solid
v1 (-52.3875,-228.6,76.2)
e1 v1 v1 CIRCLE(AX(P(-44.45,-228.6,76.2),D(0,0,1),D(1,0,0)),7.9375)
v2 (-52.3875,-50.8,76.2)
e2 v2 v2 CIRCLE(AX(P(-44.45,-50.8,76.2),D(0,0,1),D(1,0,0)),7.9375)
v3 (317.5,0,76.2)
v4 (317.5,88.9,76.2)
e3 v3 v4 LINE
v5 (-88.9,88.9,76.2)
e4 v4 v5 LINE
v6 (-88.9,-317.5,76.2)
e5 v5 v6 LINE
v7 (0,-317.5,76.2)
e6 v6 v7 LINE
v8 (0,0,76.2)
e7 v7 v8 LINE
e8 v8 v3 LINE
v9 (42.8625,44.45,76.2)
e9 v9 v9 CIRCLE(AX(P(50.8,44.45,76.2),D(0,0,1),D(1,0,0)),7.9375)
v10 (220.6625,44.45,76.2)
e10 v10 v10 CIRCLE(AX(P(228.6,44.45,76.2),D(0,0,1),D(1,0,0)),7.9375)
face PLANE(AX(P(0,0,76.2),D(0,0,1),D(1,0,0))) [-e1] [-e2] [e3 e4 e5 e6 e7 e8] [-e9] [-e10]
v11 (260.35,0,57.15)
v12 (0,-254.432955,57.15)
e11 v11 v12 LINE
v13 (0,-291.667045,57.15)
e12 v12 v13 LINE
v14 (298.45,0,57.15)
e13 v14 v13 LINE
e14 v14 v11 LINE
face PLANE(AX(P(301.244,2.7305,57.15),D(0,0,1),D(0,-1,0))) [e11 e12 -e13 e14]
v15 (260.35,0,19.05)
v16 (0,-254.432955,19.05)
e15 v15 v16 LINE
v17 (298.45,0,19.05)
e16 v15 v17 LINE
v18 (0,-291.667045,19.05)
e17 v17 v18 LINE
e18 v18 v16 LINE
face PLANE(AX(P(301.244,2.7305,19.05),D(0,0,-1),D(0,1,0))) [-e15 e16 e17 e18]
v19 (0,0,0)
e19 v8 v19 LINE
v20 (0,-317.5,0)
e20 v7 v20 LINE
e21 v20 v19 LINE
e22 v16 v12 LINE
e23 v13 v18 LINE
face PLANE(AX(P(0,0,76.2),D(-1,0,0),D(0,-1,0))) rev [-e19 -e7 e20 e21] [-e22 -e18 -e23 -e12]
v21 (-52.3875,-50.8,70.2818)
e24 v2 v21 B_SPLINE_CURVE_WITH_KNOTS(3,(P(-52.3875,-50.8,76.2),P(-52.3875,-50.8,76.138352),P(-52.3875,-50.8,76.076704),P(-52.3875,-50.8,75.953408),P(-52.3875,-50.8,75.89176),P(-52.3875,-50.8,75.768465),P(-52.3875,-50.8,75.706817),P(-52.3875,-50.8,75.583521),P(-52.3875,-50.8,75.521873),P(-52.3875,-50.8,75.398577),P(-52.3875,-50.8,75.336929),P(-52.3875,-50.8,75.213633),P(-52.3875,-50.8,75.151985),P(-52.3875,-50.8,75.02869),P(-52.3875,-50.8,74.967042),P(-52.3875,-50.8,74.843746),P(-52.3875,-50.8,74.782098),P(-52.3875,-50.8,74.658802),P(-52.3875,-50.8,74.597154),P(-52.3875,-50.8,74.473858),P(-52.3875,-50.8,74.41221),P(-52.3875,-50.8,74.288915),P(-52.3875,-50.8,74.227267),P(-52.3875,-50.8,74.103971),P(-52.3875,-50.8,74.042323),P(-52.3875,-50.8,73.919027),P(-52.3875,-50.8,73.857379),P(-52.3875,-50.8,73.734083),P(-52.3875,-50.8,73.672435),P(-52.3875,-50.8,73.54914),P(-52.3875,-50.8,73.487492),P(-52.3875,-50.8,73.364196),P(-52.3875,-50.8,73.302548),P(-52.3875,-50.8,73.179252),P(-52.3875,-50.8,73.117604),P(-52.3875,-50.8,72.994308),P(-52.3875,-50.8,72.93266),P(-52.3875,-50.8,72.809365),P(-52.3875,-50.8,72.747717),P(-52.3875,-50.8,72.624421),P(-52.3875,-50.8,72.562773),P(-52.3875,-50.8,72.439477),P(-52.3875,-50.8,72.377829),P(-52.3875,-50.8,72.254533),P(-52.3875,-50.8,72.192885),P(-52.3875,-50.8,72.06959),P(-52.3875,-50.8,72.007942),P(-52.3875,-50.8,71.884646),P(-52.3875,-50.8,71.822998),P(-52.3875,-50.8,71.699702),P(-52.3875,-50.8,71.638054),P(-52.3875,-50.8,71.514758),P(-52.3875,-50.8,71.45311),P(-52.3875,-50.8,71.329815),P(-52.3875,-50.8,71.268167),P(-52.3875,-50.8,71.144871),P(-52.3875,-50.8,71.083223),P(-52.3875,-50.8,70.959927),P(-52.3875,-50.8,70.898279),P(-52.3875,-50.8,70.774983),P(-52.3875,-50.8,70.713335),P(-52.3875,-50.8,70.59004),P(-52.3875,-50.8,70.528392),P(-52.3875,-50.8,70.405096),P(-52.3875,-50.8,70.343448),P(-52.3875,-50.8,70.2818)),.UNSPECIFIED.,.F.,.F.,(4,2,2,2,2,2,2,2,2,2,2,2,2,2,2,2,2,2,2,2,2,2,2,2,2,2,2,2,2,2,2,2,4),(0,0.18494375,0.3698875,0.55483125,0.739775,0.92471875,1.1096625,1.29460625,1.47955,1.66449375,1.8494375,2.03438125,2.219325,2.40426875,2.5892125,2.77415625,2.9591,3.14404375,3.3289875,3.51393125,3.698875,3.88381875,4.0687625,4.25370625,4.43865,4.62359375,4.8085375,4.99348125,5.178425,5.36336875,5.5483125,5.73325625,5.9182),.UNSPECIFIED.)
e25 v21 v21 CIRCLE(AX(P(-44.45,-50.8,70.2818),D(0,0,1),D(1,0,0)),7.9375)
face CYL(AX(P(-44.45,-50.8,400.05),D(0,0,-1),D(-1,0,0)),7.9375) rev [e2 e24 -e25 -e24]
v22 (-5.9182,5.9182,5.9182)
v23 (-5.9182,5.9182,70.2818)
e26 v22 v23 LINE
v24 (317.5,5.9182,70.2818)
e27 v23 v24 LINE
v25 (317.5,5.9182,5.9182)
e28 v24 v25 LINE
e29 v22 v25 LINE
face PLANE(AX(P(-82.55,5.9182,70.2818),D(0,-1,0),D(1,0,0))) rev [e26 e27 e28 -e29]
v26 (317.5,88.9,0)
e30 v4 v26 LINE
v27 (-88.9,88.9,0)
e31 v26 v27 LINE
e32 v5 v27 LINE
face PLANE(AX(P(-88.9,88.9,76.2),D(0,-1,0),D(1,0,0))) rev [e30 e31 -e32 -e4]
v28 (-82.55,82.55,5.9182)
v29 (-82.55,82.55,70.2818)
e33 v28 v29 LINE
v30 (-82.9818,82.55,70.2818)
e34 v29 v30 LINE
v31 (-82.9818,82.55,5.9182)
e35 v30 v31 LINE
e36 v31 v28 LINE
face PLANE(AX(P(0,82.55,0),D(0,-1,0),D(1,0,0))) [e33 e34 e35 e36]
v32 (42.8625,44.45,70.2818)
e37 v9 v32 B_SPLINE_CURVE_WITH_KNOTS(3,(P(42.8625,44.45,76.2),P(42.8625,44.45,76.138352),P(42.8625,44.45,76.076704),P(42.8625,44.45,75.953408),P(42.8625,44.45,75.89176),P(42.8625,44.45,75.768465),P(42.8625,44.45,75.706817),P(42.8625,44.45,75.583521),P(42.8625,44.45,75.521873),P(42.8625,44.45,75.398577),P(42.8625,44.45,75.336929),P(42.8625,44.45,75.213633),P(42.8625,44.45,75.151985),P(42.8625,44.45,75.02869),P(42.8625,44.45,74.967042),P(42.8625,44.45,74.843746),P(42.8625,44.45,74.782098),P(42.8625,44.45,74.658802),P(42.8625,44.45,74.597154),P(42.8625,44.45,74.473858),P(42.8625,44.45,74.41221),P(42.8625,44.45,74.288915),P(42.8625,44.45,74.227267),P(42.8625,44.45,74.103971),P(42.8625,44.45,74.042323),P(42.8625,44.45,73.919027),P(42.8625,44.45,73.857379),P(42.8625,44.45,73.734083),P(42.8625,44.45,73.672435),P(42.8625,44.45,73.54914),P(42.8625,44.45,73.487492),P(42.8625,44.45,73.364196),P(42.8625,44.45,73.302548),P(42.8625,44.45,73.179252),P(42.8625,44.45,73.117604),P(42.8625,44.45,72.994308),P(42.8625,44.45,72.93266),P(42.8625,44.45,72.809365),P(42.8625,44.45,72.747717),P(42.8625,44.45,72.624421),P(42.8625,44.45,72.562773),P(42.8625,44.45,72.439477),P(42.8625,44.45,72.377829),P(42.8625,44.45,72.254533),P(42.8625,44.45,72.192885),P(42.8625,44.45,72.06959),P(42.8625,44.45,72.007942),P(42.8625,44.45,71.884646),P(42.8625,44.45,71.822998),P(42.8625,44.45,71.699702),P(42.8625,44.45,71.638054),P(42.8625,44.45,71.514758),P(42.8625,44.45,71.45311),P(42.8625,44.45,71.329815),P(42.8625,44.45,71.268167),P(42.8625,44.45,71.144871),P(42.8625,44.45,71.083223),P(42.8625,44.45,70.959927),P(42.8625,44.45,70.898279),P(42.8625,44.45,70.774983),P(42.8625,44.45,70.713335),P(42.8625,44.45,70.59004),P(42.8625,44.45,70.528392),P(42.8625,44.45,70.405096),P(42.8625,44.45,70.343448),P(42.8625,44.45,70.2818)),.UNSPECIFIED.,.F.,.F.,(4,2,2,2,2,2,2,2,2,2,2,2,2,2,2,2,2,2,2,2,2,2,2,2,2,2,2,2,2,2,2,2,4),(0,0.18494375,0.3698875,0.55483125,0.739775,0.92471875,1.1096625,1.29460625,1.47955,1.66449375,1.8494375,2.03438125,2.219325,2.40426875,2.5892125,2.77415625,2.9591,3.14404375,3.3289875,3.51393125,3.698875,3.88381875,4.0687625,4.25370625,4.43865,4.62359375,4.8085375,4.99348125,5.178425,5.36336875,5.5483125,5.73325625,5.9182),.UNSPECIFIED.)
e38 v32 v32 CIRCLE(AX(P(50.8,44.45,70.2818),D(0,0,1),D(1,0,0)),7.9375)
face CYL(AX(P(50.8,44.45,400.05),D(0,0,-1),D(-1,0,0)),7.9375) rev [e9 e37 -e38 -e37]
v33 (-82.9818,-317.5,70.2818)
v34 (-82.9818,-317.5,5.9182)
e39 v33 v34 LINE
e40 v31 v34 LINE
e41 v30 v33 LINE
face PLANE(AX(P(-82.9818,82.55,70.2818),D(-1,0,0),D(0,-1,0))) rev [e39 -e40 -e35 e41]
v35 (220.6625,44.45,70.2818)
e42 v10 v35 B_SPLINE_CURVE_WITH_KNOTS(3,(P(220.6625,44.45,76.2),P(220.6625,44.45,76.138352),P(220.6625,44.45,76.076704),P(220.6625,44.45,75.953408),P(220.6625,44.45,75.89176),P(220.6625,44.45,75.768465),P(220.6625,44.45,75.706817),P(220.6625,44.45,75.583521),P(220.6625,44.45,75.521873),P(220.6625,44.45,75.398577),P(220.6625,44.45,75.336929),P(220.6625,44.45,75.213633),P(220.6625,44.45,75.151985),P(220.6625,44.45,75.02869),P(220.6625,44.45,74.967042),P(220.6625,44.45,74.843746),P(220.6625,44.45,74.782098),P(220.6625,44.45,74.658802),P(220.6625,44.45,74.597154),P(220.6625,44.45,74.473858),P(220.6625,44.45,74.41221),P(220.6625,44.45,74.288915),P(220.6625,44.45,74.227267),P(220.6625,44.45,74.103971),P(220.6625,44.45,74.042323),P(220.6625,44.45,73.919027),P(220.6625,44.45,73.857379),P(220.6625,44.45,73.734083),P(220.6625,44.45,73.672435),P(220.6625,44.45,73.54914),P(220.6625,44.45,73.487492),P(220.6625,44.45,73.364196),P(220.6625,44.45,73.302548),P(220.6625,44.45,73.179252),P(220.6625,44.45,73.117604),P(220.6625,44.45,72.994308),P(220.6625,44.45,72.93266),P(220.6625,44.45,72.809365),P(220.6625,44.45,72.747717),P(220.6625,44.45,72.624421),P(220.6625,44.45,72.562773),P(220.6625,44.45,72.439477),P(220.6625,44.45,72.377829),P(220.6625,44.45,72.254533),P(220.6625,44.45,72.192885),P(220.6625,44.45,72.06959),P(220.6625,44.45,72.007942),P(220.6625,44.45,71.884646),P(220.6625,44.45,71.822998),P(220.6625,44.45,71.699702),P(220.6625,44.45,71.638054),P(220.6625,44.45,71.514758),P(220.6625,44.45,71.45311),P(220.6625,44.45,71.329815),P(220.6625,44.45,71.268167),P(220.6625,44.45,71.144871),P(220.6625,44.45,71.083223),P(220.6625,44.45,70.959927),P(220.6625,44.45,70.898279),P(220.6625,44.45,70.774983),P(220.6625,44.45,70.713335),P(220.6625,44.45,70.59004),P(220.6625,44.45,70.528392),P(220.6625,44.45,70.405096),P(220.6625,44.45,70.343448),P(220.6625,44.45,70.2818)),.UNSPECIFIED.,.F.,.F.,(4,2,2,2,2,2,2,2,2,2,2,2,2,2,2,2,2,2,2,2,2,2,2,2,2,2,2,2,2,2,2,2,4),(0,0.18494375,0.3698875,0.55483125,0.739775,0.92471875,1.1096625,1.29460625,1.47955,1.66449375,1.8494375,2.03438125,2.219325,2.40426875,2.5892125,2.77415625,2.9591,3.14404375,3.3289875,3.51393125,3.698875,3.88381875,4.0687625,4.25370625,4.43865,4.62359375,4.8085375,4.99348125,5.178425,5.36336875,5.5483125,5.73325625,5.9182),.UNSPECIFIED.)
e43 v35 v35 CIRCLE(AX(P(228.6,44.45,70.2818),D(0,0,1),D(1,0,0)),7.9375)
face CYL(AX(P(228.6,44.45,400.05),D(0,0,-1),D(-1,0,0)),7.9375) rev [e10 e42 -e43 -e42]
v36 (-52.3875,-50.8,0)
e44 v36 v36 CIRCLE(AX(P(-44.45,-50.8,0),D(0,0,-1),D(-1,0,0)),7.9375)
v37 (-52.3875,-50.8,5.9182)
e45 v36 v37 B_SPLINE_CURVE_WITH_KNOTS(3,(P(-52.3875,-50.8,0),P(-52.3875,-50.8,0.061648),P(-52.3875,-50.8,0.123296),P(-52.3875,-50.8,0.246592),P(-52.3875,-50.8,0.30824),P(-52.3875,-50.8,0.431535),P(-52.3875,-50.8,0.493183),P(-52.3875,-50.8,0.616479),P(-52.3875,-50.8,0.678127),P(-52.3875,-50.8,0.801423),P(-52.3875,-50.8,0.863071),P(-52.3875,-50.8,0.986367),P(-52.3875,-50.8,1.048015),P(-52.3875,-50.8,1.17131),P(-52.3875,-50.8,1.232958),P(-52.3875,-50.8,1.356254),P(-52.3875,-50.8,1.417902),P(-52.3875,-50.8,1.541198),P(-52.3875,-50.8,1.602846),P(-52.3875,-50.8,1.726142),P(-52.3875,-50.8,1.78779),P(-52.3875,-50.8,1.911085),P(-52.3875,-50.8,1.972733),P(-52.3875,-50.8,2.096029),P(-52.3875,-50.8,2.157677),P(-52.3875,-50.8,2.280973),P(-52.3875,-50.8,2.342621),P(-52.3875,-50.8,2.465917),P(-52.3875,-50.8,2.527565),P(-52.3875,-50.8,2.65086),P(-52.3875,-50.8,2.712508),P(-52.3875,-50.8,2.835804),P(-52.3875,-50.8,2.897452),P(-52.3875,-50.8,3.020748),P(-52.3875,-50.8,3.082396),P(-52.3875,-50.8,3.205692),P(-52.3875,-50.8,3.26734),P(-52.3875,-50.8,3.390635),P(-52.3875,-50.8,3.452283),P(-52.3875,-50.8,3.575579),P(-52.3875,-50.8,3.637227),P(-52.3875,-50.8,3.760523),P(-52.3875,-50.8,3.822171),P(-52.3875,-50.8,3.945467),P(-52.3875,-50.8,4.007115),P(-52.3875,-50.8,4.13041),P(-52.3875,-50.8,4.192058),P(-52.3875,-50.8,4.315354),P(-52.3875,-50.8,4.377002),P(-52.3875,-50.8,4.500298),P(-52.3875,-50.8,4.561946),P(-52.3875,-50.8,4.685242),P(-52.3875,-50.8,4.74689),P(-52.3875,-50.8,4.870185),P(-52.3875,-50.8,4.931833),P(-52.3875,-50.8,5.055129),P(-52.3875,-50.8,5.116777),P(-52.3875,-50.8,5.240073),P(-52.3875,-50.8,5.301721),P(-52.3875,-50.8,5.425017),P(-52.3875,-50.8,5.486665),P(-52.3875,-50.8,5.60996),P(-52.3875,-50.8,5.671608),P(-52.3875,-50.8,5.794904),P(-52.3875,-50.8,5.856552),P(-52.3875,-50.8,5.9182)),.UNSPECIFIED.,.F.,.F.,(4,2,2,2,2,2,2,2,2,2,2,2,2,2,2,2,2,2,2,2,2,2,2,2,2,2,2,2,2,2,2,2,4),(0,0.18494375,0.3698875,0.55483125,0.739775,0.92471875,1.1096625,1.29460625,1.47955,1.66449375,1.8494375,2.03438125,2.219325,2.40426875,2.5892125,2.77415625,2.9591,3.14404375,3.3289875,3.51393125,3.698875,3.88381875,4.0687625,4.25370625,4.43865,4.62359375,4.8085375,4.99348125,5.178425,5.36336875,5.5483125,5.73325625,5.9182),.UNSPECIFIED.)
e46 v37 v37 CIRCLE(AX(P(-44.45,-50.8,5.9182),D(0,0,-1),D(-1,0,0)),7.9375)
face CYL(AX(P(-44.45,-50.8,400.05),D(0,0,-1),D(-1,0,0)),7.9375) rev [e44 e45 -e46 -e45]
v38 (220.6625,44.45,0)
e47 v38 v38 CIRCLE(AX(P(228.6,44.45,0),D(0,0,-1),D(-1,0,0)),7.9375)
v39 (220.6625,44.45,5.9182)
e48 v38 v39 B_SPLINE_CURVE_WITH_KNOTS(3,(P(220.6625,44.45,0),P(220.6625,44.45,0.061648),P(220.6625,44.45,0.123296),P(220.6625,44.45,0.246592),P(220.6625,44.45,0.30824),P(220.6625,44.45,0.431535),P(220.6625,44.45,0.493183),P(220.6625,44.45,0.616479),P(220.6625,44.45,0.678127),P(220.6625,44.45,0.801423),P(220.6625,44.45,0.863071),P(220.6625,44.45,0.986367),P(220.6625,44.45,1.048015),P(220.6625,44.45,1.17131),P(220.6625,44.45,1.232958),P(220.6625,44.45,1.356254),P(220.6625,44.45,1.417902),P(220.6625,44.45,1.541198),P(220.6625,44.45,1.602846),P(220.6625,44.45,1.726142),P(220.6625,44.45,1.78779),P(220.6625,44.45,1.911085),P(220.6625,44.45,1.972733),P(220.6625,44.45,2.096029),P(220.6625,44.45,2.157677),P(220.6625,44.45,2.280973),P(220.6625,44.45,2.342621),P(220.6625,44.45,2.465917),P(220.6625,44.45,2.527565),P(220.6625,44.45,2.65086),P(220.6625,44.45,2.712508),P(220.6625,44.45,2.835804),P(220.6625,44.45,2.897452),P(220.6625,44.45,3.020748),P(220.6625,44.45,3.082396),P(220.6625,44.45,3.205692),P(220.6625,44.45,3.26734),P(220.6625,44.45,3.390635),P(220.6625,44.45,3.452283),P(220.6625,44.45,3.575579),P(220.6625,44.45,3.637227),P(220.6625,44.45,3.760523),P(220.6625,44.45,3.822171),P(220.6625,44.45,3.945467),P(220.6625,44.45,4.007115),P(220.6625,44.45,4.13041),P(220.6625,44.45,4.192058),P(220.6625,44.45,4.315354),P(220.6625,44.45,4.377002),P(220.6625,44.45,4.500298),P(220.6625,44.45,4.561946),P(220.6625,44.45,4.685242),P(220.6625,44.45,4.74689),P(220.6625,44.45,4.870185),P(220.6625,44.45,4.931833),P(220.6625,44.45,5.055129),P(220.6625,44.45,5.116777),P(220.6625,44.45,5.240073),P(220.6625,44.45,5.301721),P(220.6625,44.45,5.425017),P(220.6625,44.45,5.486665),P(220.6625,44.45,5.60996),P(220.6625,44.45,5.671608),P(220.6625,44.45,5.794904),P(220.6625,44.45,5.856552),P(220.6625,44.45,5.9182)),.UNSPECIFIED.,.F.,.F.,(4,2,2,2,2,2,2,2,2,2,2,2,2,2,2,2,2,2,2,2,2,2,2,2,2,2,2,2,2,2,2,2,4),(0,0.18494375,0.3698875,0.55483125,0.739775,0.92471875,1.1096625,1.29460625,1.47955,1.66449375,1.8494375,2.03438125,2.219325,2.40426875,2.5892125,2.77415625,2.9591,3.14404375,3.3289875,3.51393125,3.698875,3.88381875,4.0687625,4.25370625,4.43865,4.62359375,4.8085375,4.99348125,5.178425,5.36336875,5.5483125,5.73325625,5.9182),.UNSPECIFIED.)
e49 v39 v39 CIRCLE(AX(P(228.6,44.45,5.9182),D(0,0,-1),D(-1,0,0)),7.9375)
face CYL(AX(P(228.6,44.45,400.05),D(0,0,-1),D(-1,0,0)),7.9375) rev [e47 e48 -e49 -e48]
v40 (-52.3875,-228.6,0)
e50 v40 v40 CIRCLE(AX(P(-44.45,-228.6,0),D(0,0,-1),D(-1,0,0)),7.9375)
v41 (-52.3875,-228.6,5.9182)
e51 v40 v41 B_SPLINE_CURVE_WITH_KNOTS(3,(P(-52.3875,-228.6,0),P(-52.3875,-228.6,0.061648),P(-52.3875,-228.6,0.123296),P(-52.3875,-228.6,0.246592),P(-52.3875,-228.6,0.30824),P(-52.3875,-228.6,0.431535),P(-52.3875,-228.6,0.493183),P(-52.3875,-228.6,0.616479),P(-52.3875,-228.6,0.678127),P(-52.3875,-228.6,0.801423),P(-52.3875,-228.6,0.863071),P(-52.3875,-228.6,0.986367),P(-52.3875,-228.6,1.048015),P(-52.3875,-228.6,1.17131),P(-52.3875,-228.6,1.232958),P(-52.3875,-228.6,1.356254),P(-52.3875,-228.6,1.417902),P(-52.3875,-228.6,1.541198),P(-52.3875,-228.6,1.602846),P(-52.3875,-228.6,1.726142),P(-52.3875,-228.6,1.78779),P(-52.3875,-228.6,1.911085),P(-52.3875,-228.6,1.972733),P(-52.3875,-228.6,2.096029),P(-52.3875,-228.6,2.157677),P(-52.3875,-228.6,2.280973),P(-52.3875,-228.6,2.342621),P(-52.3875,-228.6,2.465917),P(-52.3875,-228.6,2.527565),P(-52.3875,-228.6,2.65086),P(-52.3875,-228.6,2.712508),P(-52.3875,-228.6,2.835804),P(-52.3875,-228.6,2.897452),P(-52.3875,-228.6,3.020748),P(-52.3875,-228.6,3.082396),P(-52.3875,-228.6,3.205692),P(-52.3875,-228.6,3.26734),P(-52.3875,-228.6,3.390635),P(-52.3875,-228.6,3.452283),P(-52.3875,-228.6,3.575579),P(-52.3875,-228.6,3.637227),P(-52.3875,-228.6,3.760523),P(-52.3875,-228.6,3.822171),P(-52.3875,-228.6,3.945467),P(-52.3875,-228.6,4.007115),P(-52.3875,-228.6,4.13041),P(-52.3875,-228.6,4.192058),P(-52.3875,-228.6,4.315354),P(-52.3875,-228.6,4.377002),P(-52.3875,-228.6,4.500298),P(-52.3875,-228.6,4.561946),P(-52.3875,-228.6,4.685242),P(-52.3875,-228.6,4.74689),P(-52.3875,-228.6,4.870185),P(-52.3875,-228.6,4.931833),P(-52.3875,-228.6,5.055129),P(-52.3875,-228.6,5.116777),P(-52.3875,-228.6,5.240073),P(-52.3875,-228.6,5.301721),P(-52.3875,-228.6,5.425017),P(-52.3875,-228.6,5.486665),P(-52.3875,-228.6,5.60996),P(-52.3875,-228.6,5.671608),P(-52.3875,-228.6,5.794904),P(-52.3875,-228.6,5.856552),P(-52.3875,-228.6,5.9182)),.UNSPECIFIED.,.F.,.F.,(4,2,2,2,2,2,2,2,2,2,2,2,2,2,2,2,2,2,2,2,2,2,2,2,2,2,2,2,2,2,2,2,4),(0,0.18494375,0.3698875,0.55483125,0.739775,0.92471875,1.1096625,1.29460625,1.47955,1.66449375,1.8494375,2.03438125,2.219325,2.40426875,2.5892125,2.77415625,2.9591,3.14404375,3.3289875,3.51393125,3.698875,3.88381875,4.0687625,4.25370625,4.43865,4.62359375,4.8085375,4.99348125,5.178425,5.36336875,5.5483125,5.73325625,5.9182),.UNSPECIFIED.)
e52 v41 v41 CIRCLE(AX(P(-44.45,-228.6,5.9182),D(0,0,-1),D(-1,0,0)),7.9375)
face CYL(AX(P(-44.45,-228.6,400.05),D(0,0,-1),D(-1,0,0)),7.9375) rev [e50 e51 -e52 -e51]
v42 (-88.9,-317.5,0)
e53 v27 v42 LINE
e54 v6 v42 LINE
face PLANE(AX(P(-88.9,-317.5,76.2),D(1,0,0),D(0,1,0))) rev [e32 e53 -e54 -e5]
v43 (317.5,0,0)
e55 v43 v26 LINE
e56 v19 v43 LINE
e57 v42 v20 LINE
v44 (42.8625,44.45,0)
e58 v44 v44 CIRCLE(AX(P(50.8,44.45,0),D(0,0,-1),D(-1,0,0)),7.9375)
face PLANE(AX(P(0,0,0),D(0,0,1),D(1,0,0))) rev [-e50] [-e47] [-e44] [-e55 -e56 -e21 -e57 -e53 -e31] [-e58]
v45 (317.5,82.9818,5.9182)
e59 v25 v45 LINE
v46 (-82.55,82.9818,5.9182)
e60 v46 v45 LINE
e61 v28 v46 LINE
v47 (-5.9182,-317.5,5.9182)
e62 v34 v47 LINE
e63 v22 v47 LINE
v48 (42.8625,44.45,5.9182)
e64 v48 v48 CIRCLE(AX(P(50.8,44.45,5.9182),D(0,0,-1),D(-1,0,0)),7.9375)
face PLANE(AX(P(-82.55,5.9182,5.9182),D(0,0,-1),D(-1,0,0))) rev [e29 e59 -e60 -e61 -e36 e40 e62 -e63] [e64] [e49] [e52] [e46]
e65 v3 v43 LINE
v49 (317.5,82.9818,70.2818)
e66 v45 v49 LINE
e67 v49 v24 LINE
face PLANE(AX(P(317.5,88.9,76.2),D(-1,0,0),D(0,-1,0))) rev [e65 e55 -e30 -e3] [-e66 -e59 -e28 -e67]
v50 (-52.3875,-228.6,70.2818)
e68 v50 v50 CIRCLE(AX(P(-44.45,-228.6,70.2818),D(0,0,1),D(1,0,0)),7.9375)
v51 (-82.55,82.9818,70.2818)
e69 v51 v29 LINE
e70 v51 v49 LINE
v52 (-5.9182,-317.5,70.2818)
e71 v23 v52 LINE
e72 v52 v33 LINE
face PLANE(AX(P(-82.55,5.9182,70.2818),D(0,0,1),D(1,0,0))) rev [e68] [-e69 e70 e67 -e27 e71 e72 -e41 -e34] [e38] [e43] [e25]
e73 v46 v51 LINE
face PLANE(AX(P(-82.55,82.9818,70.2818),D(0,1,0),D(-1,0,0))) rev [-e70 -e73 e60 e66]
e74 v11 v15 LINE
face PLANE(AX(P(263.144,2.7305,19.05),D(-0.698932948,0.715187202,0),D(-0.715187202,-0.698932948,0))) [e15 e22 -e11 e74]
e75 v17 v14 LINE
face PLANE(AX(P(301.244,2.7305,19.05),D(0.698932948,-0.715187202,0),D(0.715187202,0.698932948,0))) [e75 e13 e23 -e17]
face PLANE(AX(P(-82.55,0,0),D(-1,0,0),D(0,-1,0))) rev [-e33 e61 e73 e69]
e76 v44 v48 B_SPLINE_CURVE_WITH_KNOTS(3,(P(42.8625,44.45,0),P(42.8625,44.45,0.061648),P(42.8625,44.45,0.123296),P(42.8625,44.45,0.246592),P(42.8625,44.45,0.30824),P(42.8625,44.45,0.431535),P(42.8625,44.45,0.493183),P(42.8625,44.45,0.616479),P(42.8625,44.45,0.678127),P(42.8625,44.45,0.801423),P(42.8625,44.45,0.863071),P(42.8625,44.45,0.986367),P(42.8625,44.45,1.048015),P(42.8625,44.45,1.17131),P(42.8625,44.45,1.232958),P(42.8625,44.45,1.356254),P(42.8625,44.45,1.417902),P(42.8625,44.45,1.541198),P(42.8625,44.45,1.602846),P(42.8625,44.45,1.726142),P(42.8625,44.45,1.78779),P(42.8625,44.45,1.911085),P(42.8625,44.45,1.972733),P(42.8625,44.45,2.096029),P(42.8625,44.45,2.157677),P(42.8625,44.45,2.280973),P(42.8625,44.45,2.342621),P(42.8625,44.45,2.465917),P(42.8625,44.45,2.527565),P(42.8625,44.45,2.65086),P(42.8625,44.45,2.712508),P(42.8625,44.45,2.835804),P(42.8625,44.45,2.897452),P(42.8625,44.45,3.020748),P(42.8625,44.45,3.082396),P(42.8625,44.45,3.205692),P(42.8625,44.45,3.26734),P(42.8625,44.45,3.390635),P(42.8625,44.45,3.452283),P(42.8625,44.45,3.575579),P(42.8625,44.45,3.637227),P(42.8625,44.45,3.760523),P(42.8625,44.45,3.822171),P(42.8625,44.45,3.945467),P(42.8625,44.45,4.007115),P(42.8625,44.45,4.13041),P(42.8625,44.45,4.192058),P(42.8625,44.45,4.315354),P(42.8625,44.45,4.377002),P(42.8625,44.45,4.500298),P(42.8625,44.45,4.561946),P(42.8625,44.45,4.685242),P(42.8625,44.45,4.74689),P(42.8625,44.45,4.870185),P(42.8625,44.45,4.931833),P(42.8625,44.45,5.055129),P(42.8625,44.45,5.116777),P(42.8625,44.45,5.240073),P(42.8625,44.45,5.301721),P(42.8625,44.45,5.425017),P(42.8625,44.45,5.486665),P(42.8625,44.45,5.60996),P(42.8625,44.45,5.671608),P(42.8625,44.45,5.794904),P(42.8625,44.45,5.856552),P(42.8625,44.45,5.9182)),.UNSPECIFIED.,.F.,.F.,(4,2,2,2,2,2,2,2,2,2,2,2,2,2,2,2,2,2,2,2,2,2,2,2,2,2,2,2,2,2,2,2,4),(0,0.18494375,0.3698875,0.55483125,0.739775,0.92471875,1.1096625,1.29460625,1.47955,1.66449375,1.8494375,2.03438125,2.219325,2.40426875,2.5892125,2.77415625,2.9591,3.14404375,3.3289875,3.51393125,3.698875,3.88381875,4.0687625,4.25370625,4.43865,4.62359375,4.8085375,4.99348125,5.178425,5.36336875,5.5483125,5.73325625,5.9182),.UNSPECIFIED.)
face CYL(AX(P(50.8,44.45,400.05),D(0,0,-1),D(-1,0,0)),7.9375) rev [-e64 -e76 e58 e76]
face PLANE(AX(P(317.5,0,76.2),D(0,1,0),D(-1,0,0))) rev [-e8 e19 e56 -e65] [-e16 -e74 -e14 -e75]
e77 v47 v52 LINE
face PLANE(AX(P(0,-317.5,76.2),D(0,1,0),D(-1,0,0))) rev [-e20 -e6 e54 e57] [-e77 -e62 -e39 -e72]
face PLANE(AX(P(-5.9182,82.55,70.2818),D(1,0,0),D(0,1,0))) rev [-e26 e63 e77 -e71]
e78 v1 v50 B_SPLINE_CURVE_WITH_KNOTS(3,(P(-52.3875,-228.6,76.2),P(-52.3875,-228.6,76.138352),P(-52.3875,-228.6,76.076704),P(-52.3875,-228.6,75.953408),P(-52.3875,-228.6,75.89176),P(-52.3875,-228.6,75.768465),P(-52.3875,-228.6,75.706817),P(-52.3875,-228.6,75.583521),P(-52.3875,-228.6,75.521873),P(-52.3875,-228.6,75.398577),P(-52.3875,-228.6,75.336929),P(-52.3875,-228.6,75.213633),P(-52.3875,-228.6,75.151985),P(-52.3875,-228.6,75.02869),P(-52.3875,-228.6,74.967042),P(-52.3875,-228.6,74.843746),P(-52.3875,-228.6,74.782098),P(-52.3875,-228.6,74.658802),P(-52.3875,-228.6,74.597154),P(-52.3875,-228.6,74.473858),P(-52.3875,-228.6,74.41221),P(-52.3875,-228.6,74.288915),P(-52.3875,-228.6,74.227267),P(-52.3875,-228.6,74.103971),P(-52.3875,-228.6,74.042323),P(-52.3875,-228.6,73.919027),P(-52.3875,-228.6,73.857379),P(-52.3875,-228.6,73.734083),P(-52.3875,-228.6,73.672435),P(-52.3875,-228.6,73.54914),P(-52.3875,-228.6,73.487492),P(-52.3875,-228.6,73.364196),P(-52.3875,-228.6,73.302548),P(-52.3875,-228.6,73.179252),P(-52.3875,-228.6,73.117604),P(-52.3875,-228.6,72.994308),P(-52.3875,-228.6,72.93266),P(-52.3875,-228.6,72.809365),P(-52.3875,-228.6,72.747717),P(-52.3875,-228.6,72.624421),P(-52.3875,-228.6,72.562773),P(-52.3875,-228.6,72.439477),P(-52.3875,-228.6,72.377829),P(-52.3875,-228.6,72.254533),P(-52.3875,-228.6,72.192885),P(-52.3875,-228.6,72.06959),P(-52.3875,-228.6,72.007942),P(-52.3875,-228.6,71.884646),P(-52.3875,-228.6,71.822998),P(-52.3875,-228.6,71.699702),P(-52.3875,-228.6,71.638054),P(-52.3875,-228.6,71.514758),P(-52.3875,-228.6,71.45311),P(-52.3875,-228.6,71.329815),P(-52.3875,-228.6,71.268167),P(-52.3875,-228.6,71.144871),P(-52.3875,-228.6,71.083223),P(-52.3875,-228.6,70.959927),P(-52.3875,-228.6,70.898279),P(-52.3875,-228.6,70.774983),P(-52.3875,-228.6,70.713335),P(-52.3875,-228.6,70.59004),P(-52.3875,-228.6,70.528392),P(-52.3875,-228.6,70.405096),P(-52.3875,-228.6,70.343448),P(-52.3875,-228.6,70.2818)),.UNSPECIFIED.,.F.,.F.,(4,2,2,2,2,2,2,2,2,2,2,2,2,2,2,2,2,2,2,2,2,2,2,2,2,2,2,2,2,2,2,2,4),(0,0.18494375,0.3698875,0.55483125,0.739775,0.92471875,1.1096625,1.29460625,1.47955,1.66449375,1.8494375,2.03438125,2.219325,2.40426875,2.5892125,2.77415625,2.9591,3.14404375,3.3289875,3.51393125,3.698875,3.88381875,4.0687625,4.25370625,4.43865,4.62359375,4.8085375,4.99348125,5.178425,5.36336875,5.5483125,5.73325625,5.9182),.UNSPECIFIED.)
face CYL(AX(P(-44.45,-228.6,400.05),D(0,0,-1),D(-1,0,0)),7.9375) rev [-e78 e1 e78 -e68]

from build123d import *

# Parameters (mm, degrees)
BOSS_EXTRUDE1_DEPTH = 76.2
SKETCH2_W           = 64.3636
SKETCH2_H           = 77.0636
CUT_EXTRUDE1_DEPTH  = 400.05
SKETCH3_W           = 77.0636
SKETCH3_H           = 64.3636
CUT_EXTRUDE2_DEPTH  = 400.05
SWEEP2_START        = 19.05
SWEEP2_DEPTH        = 38.1
SKETCH12_R          = 7.9375
CUT_EXTRUDE3_DEPTH  = 400.05


# Read off the part's stored shape, not the designer's step: Sweep2
with BuildPart() as part:
    # Sketch1 → Boss-Extrude1 (new body)
    with BuildSketch(Plane.XY):
        Polygon((0, 0), (0, -317.5), (-88.9, -317.5), (-88.9, 88.9), (317.5, 88.9), (317.5, 0), align=None)
    extrude(amount=BOSS_EXTRUDE1_DEPTH)

    # Sketch2 → Cut-Extrude1 (cut)
    with BuildSketch(Plane(origin=(317.5, 0, 0), x_dir=(0, 0, -1), z_dir=(1, 0, 0))):
        with Locations((-38.1, 44.45)):
            Rectangle(SKETCH2_W, SKETCH2_H)
    extrude(amount=-CUT_EXTRUDE1_DEPTH, mode=Mode.SUBTRACT)

    # Sketch3 → Cut-Extrude2 (cut)
    with BuildSketch(Plane.XZ.offset(317.5)):
        with Locations((-44.45, 38.1)):
            Rectangle(SKETCH3_W, SKETCH3_H)
    extrude(amount=-CUT_EXTRUDE2_DEPTH, mode=Mode.SUBTRACT)

    # Sweep2 outline → Sweep2 (add)
    with BuildSketch(Plane.XY.offset(SWEEP2_START)):
        Polygon((0, -254.432954545), (0, -291.667045455), (298.45, 0), (260.35, 0), align=None)
    extrude(amount=SWEEP2_DEPTH)

    # Sketch12 → Cut-Extrude3 (cut)
    with BuildSketch(Plane(origin=(0, 0, 0), x_dir=(-1, 0, 0), z_dir=(0, 0, -1))):
        with Locations((44.45, -228.6)):
            Circle(SKETCH12_R)
        with Locations((44.45, -50.8)):
            Circle(SKETCH12_R)
        with Locations((-50.8, 44.45)):
            Circle(SKETCH12_R)
        with Locations((-228.6, 44.45)):
            Circle(SKETCH12_R)
    extrude(amount=-CUT_EXTRUDE3_DEPTH, mode=Mode.SUBTRACT)


solid = part.part
